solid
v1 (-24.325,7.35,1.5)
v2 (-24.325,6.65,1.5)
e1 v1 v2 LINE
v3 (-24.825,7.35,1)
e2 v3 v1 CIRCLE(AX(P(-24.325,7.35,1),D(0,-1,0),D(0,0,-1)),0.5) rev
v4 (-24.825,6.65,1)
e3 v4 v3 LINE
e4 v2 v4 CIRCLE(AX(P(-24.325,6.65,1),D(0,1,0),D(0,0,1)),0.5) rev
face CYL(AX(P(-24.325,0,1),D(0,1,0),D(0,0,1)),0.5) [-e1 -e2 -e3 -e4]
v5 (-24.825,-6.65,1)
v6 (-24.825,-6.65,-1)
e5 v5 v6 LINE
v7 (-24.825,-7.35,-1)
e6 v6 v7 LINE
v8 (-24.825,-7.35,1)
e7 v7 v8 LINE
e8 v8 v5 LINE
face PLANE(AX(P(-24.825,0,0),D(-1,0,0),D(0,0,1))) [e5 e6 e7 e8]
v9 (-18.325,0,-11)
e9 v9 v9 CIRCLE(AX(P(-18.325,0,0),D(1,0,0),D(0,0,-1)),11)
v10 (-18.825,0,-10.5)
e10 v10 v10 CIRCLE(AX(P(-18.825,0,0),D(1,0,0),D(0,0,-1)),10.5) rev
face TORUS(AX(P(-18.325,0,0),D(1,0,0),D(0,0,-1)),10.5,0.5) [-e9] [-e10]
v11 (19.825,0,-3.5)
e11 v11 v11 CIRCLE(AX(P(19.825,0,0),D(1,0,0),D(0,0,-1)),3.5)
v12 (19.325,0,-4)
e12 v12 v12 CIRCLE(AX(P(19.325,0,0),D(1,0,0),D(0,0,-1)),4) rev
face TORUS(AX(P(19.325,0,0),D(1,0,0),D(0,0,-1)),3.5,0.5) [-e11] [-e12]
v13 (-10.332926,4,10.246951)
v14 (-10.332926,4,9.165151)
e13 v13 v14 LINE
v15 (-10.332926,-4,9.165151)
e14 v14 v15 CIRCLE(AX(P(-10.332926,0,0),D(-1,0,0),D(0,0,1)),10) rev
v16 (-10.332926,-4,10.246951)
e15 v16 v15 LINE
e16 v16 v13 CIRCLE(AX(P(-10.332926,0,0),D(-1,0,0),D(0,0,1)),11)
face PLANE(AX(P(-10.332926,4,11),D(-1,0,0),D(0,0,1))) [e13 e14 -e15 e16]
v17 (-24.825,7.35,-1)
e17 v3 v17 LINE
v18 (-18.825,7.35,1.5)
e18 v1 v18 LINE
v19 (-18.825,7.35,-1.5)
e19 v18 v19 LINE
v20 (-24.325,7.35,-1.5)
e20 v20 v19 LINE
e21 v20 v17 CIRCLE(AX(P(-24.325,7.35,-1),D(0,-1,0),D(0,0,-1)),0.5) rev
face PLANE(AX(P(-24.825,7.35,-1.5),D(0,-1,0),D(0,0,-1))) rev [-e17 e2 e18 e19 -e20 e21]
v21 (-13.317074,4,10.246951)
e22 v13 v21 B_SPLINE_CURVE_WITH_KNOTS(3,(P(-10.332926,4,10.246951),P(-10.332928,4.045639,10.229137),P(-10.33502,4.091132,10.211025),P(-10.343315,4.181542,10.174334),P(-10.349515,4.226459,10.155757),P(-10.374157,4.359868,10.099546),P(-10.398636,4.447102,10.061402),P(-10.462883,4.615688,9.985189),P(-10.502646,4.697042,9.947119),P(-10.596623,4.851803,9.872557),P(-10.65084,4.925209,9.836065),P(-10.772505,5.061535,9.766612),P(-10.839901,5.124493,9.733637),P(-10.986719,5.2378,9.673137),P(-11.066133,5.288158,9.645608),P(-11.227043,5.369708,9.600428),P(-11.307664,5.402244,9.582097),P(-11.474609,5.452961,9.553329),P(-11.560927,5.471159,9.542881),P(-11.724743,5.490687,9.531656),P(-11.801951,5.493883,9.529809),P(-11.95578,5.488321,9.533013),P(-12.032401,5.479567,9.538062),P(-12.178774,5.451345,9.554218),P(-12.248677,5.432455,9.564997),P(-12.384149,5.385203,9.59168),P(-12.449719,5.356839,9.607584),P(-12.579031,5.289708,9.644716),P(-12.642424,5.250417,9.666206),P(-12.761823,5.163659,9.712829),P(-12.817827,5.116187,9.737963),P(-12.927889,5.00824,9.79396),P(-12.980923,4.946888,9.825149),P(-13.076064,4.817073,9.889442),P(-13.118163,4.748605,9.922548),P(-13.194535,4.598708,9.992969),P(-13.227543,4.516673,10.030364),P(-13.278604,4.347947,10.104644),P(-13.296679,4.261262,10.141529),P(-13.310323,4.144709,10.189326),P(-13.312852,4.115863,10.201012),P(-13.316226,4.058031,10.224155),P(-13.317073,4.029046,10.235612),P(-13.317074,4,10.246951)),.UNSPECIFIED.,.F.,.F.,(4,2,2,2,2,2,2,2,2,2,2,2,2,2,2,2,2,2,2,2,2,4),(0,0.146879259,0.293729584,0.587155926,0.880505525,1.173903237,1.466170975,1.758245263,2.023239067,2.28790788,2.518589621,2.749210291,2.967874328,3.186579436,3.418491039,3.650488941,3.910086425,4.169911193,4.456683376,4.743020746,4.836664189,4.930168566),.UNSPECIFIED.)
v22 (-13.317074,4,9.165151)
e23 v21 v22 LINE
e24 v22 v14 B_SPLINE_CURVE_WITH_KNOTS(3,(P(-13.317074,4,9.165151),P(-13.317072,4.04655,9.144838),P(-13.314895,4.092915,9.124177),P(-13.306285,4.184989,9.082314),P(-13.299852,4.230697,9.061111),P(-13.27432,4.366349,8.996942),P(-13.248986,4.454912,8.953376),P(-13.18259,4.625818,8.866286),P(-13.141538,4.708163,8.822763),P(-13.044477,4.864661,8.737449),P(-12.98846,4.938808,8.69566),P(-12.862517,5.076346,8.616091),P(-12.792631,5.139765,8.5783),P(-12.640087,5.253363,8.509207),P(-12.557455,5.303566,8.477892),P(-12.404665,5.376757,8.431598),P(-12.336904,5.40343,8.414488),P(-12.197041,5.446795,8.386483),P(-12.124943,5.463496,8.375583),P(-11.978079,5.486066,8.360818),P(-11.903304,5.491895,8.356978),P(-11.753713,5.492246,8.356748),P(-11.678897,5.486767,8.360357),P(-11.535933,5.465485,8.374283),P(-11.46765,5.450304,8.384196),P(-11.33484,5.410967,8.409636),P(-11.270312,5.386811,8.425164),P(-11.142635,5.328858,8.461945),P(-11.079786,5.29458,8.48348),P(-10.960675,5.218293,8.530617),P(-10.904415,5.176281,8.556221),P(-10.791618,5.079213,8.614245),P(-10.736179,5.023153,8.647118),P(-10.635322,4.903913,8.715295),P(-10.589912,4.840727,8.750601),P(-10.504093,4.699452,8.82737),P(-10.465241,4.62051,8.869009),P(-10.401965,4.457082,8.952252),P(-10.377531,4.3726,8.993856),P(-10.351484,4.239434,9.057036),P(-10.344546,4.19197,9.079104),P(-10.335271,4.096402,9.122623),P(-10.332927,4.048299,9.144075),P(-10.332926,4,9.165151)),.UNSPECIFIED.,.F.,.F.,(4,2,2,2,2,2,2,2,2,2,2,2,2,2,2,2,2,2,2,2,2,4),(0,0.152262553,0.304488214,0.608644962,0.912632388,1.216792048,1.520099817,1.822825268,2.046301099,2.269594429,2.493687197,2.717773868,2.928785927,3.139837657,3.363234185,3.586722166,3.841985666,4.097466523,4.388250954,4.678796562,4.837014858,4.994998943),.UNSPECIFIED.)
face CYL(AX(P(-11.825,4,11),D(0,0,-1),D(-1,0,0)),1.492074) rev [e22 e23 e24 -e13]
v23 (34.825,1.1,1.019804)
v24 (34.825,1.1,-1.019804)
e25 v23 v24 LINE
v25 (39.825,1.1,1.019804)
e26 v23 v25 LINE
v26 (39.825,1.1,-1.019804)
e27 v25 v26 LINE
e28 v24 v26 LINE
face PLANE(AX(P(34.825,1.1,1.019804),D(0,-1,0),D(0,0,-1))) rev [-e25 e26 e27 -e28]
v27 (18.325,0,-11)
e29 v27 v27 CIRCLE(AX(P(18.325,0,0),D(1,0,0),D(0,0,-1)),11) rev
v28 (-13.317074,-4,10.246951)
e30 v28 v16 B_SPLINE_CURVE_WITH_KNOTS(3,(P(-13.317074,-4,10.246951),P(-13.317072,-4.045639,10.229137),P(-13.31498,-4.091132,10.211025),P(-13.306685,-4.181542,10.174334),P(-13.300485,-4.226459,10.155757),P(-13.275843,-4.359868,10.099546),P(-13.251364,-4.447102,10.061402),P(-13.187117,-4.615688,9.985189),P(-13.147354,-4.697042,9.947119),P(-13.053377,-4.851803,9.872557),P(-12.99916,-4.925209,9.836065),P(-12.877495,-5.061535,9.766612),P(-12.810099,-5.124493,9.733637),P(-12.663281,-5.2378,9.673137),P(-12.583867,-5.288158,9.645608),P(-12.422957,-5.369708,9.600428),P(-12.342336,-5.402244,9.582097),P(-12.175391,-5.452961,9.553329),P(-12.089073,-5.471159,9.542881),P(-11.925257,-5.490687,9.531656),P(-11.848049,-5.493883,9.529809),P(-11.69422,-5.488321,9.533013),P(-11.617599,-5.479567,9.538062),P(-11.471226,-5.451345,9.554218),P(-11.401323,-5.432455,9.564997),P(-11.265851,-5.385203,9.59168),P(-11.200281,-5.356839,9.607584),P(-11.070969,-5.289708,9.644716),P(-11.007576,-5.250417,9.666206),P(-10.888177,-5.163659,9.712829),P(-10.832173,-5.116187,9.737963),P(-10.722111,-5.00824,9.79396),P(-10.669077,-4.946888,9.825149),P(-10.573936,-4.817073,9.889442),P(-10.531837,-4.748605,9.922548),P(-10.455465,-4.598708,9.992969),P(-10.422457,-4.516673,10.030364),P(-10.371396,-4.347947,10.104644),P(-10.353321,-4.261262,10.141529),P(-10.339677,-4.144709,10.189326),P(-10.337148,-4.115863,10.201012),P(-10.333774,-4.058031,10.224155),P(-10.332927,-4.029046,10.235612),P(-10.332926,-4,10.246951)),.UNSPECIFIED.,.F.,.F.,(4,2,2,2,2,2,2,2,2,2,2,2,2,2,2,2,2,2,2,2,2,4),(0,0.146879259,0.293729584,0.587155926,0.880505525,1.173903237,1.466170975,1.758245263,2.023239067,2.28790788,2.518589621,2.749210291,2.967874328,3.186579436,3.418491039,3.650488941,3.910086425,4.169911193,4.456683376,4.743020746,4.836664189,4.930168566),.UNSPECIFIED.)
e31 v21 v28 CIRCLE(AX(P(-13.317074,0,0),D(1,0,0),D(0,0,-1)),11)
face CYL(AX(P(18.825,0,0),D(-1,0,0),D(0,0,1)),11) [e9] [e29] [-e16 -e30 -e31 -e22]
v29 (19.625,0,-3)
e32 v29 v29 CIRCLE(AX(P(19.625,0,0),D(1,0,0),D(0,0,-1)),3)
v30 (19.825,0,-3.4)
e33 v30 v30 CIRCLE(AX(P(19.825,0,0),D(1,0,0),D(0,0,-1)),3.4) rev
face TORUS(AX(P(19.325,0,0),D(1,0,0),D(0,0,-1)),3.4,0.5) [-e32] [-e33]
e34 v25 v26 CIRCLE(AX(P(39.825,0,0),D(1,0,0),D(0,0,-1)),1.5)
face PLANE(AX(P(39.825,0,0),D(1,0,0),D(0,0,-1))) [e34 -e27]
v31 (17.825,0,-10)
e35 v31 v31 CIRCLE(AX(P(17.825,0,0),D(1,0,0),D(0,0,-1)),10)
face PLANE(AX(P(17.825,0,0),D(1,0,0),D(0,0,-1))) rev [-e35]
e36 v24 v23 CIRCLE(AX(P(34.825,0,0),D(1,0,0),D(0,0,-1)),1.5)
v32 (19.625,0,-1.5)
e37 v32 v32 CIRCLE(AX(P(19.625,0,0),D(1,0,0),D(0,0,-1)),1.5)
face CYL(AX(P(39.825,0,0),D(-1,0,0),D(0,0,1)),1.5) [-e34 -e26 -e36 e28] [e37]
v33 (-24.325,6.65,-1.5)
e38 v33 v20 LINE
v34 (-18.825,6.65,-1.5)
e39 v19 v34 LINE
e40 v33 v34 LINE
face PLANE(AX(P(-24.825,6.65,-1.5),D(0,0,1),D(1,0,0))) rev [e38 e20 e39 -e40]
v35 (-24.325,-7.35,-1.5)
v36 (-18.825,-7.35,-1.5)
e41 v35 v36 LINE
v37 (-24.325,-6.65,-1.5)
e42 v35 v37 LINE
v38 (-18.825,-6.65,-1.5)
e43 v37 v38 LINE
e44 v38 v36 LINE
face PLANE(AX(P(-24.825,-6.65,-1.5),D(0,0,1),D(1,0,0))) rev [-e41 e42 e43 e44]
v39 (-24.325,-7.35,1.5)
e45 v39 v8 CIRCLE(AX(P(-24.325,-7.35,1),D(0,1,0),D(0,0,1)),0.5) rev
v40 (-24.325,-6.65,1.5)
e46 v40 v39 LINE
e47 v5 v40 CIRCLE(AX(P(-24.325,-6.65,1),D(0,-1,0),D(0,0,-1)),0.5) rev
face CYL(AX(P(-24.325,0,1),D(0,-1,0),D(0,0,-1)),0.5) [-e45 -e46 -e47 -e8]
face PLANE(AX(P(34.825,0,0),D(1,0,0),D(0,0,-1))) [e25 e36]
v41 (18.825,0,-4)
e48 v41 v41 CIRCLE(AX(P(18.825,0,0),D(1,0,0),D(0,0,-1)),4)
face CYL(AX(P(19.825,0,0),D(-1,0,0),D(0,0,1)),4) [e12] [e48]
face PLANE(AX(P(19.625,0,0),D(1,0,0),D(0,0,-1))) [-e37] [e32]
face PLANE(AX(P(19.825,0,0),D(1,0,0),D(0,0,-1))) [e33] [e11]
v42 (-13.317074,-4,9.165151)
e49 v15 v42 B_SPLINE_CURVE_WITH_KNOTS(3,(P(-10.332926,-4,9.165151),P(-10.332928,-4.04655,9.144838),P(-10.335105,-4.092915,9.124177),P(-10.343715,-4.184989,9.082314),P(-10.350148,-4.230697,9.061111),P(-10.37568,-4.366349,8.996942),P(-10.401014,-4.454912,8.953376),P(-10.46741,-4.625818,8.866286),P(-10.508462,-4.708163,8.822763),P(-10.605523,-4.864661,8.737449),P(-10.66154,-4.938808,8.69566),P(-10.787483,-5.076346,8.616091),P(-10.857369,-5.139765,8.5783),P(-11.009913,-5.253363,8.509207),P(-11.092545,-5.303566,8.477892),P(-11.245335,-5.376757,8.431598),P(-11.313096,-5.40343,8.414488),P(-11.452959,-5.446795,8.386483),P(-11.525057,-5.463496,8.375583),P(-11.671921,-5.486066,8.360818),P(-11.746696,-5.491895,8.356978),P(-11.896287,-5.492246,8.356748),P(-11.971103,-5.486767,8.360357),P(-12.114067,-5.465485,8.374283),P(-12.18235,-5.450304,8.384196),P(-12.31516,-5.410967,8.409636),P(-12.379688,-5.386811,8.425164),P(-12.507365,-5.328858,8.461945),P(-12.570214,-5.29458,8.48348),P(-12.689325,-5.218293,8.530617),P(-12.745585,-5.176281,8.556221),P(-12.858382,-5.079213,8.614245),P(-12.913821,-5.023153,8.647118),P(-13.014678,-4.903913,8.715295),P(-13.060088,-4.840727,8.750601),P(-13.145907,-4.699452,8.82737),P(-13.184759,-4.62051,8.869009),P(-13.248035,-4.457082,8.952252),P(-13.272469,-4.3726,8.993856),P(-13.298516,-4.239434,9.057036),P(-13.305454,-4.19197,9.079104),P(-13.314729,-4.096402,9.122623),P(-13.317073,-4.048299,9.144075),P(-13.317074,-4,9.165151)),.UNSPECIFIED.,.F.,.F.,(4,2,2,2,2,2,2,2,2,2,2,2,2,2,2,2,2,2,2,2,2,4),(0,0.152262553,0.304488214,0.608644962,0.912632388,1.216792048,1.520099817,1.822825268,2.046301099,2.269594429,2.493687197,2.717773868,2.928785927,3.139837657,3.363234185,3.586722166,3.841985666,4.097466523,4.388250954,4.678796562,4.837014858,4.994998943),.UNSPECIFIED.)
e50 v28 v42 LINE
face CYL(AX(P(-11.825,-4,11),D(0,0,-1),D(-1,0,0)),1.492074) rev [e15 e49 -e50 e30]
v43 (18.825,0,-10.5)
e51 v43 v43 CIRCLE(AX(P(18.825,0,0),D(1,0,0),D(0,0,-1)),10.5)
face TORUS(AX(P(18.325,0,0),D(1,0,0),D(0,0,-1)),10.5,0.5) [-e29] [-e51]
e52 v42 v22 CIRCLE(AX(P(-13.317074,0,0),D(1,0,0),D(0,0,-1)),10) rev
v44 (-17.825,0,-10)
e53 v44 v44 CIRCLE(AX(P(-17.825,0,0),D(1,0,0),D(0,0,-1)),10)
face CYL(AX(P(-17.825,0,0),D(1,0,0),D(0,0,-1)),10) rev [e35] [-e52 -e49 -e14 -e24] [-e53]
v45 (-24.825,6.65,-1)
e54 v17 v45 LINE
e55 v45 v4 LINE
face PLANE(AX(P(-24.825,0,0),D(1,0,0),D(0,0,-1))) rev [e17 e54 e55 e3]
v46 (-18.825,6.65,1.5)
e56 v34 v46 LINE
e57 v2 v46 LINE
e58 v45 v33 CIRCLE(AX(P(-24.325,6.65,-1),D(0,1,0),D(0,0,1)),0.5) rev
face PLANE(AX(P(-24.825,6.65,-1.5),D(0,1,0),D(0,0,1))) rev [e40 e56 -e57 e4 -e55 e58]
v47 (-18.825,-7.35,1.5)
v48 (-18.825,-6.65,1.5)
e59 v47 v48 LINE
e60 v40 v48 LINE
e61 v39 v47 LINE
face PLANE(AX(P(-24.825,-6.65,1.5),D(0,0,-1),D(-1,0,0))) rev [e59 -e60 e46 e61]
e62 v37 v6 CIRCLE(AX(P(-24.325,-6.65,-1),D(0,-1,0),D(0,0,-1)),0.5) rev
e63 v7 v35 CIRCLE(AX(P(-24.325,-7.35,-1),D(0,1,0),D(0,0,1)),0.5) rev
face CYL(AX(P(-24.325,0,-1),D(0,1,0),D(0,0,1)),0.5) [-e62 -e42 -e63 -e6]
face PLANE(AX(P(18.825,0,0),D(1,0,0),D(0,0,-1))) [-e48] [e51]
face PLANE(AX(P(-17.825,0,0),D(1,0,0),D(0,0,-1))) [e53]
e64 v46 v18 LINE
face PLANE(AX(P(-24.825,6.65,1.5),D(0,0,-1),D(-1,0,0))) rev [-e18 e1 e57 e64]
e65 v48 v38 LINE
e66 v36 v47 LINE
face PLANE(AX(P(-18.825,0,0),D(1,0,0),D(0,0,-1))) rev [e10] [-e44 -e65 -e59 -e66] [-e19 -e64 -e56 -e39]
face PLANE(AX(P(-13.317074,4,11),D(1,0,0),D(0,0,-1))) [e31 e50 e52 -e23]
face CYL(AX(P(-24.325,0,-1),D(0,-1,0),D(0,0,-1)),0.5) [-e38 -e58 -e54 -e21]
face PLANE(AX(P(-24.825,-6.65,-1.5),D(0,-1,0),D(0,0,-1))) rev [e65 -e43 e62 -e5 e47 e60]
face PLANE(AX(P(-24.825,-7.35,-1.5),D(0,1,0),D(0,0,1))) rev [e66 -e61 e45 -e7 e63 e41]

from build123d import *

# Parameters (mm, degrees)
SKETCH_1_R          = 11
EXTRUDE_1_DEPTH     = 18.825
SKETCH_3_R          = 10
CUT_EXTRUDE_1_DEPTH = 17.825
CUT_EXTRUDE_2_DEPTH = 25.420905491
FILLET_1_R          = 0.5
SKETCH_5_W          = 3
SKETCH_5_H          = 0.7
EXTRUDE_2_DEPTH     = 6
FILLET_2_R          = 0.5
SKETCH_7_R          = 3.5
EXTRUDE_3_DEPTH     = 1
SKETCH_8_R          = 1.5
EXTRUDE_4_DEPTH     = 20
CUT_EXTRUDE_START   = -5
CUT_EXTRUDE_3_DEPTH = 5
SKETCH_10_R         = 4
EXTRUDE_5_DEPTH     = 1
FILLET_4_R          = 0.5
CUT_EXTRUDE_START_2 = -0.2
SKETCH_11_R         = 3
SKETCH_11_R_2       = 1.5
CUT_EXTRUDE_4_DEPTH = 0.2
FILLET_5_R          = 0.5


with BuildPart() as part:
    # 草图1 → 凸台-拉伸1 (new, symmetric)
    with BuildSketch(Plane(origin=(0, 0, 0), x_dir=(0, 0, -1), z_dir=(1, 0, 0))):
        with Locations(Location((0, 0, 0), (0, 0, 180))):
            Circle(SKETCH_1_R)
    extrude(amount=EXTRUDE_1_DEPTH, both=True)

    # 草图3 → 切除-拉伸1 (cut, symmetric)
    with BuildSketch(Plane(origin=(0, 0, 0), x_dir=(0, 0, -1), z_dir=(1, 0, 0))):
        Circle(SKETCH_3_R)
    extrude(amount=CUT_EXTRUDE_1_DEPTH, both=True, mode=Mode.SUBTRACT)

    # 草图4 → 切除-拉伸2 (cut, through all)
    with BuildSketch(Plane.XY):
        with BuildLine():
            Line((-10.332925503, 4), (-10.332925503, -4))
            ThreePointArc((-10.332925503, -4), (-11.825, -5.492074497), (-13.317074497, -4))
            Line((-13.317074497, -4), (-13.317074497, 4))
            ThreePointArc((-13.317074497, 4), (-11.825, 5.492074497), (-10.332925503, 4))
        make_face()
    extrude(amount=CUT_EXTRUDE_2_DEPTH, mode=Mode.SUBTRACT)

    # 圆角1
    fillet_1_edges = [part.edges().sort_by_distance(p)[0] for p in [
        (-18.825, 0, -11),
        (18.825, 0, -11),
    ]]
    fillet(fillet_1_edges, radius=FILLET_1_R)

    # 草图5 → 凸台-拉伸2 (add)
    with BuildSketch(Plane.ZY.offset(18.825)):
        with Locations((0, 7)):
            Rectangle(SKETCH_5_W, SKETCH_5_H)
        with Locations((0, -7)):
            Rectangle(SKETCH_5_W, SKETCH_5_H)
    extrude(amount=EXTRUDE_2_DEPTH)

    # 圆角2
    fillet_2_edges = [part.edges().sort_by_distance(p)[0] for p in [
        (-24.825, 7, 1.5),
        (-24.825, 7, -1.5),
        (-24.825, -7, -1.5),
        (-24.825, -7, 1.5),
    ]]
    fillet(fillet_2_edges, radius=FILLET_2_R)

    # 草图7 → 凸台-拉伸3 (add)
    with BuildSketch(Plane(origin=(18.825, 0, 0), x_dir=(0, 0, -1), z_dir=(1, 0, 0))):
        Circle(SKETCH_7_R)
    extrude(amount=EXTRUDE_3_DEPTH)

    # 草图8 → 凸台-拉伸4 (add)
    with BuildSketch(Plane(origin=(19.825, 0, 0), x_dir=(0, 0, -1), z_dir=(1, 0, 0))):
        Circle(SKETCH_8_R)
    extrude(amount=EXTRUDE_4_DEPTH)

    # 草图9 → 切除-拉伸3 (cut)
    with BuildSketch(Plane(origin=(39.825, 0, 0), x_dir=(0, 0, -1), z_dir=(1, 0, 0)).offset(CUT_EXTRUDE_START)):
        with BuildLine():
            Line((-1.019803903, 1.1), (1.019803903, 1.1))
            ThreePointArc((1.019803903, 1.1), (0, 1.5), (-1.019803903, 1.1))
        make_face()
    extrude(amount=CUT_EXTRUDE_3_DEPTH, mode=Mode.SUBTRACT)

    # 草图10 → 凸台-拉伸5 (add)
    with BuildSketch(Plane(origin=(18.825, 0, 0), x_dir=(0, 0, -1), z_dir=(1, 0, 0))):
        Circle(SKETCH_10_R)
    extrude(amount=EXTRUDE_5_DEPTH)

    # 圆角4
    fillet_4_edges = [part.edges().sort_by_distance(p)[0] for p in [
        (19.825, 0, 4),
    ]]
    fillet(fillet_4_edges, radius=FILLET_4_R)

    # 草图11 → 切除-拉伸4 (cut)
    with BuildSketch(Plane(origin=(19.825, 0, 0), x_dir=(0, 0, -1), z_dir=(1, 0, 0)).offset(CUT_EXTRUDE_START_2)):
        Circle(SKETCH_11_R)
        with Locations(Location((0, 0, 0), (0, 0, 132.833428066))):
            Circle(SKETCH_11_R_2, mode=Mode.SUBTRACT)
    extrude(amount=CUT_EXTRUDE_4_DEPTH, mode=Mode.SUBTRACT)

    # 圆角5
    # the kernel refuses this fillet: 0.5 mm, written as the material it takes off along each edge
    with BuildSketch(Plane(origin=(19.825, 0, 0), x_dir=(0, 0, -1), z_dir=(0, -1, 0))) as fillet_5_piece_1:
        with BuildLine():
            CenterArc((3.4, -0.5), FILLET_5_R, 90, 53.130102355)
            Line((3, -0.2), (2.992, -0.194))
            ThreePointArc((2.992, -0.194), (2.99, -0.1), (2.99, 0))
            Line((2.99, 0), (3, 0.01))
            Line((3, 0.01), (3.4, 0.01))
            Line((3.4, 0.01), (3.4, 0))
        make_face()
    revolve(axis=Axis((19.825, 0, 0), (1, 0, 0)), mode=Mode.SUBTRACT)


solid = part.part
